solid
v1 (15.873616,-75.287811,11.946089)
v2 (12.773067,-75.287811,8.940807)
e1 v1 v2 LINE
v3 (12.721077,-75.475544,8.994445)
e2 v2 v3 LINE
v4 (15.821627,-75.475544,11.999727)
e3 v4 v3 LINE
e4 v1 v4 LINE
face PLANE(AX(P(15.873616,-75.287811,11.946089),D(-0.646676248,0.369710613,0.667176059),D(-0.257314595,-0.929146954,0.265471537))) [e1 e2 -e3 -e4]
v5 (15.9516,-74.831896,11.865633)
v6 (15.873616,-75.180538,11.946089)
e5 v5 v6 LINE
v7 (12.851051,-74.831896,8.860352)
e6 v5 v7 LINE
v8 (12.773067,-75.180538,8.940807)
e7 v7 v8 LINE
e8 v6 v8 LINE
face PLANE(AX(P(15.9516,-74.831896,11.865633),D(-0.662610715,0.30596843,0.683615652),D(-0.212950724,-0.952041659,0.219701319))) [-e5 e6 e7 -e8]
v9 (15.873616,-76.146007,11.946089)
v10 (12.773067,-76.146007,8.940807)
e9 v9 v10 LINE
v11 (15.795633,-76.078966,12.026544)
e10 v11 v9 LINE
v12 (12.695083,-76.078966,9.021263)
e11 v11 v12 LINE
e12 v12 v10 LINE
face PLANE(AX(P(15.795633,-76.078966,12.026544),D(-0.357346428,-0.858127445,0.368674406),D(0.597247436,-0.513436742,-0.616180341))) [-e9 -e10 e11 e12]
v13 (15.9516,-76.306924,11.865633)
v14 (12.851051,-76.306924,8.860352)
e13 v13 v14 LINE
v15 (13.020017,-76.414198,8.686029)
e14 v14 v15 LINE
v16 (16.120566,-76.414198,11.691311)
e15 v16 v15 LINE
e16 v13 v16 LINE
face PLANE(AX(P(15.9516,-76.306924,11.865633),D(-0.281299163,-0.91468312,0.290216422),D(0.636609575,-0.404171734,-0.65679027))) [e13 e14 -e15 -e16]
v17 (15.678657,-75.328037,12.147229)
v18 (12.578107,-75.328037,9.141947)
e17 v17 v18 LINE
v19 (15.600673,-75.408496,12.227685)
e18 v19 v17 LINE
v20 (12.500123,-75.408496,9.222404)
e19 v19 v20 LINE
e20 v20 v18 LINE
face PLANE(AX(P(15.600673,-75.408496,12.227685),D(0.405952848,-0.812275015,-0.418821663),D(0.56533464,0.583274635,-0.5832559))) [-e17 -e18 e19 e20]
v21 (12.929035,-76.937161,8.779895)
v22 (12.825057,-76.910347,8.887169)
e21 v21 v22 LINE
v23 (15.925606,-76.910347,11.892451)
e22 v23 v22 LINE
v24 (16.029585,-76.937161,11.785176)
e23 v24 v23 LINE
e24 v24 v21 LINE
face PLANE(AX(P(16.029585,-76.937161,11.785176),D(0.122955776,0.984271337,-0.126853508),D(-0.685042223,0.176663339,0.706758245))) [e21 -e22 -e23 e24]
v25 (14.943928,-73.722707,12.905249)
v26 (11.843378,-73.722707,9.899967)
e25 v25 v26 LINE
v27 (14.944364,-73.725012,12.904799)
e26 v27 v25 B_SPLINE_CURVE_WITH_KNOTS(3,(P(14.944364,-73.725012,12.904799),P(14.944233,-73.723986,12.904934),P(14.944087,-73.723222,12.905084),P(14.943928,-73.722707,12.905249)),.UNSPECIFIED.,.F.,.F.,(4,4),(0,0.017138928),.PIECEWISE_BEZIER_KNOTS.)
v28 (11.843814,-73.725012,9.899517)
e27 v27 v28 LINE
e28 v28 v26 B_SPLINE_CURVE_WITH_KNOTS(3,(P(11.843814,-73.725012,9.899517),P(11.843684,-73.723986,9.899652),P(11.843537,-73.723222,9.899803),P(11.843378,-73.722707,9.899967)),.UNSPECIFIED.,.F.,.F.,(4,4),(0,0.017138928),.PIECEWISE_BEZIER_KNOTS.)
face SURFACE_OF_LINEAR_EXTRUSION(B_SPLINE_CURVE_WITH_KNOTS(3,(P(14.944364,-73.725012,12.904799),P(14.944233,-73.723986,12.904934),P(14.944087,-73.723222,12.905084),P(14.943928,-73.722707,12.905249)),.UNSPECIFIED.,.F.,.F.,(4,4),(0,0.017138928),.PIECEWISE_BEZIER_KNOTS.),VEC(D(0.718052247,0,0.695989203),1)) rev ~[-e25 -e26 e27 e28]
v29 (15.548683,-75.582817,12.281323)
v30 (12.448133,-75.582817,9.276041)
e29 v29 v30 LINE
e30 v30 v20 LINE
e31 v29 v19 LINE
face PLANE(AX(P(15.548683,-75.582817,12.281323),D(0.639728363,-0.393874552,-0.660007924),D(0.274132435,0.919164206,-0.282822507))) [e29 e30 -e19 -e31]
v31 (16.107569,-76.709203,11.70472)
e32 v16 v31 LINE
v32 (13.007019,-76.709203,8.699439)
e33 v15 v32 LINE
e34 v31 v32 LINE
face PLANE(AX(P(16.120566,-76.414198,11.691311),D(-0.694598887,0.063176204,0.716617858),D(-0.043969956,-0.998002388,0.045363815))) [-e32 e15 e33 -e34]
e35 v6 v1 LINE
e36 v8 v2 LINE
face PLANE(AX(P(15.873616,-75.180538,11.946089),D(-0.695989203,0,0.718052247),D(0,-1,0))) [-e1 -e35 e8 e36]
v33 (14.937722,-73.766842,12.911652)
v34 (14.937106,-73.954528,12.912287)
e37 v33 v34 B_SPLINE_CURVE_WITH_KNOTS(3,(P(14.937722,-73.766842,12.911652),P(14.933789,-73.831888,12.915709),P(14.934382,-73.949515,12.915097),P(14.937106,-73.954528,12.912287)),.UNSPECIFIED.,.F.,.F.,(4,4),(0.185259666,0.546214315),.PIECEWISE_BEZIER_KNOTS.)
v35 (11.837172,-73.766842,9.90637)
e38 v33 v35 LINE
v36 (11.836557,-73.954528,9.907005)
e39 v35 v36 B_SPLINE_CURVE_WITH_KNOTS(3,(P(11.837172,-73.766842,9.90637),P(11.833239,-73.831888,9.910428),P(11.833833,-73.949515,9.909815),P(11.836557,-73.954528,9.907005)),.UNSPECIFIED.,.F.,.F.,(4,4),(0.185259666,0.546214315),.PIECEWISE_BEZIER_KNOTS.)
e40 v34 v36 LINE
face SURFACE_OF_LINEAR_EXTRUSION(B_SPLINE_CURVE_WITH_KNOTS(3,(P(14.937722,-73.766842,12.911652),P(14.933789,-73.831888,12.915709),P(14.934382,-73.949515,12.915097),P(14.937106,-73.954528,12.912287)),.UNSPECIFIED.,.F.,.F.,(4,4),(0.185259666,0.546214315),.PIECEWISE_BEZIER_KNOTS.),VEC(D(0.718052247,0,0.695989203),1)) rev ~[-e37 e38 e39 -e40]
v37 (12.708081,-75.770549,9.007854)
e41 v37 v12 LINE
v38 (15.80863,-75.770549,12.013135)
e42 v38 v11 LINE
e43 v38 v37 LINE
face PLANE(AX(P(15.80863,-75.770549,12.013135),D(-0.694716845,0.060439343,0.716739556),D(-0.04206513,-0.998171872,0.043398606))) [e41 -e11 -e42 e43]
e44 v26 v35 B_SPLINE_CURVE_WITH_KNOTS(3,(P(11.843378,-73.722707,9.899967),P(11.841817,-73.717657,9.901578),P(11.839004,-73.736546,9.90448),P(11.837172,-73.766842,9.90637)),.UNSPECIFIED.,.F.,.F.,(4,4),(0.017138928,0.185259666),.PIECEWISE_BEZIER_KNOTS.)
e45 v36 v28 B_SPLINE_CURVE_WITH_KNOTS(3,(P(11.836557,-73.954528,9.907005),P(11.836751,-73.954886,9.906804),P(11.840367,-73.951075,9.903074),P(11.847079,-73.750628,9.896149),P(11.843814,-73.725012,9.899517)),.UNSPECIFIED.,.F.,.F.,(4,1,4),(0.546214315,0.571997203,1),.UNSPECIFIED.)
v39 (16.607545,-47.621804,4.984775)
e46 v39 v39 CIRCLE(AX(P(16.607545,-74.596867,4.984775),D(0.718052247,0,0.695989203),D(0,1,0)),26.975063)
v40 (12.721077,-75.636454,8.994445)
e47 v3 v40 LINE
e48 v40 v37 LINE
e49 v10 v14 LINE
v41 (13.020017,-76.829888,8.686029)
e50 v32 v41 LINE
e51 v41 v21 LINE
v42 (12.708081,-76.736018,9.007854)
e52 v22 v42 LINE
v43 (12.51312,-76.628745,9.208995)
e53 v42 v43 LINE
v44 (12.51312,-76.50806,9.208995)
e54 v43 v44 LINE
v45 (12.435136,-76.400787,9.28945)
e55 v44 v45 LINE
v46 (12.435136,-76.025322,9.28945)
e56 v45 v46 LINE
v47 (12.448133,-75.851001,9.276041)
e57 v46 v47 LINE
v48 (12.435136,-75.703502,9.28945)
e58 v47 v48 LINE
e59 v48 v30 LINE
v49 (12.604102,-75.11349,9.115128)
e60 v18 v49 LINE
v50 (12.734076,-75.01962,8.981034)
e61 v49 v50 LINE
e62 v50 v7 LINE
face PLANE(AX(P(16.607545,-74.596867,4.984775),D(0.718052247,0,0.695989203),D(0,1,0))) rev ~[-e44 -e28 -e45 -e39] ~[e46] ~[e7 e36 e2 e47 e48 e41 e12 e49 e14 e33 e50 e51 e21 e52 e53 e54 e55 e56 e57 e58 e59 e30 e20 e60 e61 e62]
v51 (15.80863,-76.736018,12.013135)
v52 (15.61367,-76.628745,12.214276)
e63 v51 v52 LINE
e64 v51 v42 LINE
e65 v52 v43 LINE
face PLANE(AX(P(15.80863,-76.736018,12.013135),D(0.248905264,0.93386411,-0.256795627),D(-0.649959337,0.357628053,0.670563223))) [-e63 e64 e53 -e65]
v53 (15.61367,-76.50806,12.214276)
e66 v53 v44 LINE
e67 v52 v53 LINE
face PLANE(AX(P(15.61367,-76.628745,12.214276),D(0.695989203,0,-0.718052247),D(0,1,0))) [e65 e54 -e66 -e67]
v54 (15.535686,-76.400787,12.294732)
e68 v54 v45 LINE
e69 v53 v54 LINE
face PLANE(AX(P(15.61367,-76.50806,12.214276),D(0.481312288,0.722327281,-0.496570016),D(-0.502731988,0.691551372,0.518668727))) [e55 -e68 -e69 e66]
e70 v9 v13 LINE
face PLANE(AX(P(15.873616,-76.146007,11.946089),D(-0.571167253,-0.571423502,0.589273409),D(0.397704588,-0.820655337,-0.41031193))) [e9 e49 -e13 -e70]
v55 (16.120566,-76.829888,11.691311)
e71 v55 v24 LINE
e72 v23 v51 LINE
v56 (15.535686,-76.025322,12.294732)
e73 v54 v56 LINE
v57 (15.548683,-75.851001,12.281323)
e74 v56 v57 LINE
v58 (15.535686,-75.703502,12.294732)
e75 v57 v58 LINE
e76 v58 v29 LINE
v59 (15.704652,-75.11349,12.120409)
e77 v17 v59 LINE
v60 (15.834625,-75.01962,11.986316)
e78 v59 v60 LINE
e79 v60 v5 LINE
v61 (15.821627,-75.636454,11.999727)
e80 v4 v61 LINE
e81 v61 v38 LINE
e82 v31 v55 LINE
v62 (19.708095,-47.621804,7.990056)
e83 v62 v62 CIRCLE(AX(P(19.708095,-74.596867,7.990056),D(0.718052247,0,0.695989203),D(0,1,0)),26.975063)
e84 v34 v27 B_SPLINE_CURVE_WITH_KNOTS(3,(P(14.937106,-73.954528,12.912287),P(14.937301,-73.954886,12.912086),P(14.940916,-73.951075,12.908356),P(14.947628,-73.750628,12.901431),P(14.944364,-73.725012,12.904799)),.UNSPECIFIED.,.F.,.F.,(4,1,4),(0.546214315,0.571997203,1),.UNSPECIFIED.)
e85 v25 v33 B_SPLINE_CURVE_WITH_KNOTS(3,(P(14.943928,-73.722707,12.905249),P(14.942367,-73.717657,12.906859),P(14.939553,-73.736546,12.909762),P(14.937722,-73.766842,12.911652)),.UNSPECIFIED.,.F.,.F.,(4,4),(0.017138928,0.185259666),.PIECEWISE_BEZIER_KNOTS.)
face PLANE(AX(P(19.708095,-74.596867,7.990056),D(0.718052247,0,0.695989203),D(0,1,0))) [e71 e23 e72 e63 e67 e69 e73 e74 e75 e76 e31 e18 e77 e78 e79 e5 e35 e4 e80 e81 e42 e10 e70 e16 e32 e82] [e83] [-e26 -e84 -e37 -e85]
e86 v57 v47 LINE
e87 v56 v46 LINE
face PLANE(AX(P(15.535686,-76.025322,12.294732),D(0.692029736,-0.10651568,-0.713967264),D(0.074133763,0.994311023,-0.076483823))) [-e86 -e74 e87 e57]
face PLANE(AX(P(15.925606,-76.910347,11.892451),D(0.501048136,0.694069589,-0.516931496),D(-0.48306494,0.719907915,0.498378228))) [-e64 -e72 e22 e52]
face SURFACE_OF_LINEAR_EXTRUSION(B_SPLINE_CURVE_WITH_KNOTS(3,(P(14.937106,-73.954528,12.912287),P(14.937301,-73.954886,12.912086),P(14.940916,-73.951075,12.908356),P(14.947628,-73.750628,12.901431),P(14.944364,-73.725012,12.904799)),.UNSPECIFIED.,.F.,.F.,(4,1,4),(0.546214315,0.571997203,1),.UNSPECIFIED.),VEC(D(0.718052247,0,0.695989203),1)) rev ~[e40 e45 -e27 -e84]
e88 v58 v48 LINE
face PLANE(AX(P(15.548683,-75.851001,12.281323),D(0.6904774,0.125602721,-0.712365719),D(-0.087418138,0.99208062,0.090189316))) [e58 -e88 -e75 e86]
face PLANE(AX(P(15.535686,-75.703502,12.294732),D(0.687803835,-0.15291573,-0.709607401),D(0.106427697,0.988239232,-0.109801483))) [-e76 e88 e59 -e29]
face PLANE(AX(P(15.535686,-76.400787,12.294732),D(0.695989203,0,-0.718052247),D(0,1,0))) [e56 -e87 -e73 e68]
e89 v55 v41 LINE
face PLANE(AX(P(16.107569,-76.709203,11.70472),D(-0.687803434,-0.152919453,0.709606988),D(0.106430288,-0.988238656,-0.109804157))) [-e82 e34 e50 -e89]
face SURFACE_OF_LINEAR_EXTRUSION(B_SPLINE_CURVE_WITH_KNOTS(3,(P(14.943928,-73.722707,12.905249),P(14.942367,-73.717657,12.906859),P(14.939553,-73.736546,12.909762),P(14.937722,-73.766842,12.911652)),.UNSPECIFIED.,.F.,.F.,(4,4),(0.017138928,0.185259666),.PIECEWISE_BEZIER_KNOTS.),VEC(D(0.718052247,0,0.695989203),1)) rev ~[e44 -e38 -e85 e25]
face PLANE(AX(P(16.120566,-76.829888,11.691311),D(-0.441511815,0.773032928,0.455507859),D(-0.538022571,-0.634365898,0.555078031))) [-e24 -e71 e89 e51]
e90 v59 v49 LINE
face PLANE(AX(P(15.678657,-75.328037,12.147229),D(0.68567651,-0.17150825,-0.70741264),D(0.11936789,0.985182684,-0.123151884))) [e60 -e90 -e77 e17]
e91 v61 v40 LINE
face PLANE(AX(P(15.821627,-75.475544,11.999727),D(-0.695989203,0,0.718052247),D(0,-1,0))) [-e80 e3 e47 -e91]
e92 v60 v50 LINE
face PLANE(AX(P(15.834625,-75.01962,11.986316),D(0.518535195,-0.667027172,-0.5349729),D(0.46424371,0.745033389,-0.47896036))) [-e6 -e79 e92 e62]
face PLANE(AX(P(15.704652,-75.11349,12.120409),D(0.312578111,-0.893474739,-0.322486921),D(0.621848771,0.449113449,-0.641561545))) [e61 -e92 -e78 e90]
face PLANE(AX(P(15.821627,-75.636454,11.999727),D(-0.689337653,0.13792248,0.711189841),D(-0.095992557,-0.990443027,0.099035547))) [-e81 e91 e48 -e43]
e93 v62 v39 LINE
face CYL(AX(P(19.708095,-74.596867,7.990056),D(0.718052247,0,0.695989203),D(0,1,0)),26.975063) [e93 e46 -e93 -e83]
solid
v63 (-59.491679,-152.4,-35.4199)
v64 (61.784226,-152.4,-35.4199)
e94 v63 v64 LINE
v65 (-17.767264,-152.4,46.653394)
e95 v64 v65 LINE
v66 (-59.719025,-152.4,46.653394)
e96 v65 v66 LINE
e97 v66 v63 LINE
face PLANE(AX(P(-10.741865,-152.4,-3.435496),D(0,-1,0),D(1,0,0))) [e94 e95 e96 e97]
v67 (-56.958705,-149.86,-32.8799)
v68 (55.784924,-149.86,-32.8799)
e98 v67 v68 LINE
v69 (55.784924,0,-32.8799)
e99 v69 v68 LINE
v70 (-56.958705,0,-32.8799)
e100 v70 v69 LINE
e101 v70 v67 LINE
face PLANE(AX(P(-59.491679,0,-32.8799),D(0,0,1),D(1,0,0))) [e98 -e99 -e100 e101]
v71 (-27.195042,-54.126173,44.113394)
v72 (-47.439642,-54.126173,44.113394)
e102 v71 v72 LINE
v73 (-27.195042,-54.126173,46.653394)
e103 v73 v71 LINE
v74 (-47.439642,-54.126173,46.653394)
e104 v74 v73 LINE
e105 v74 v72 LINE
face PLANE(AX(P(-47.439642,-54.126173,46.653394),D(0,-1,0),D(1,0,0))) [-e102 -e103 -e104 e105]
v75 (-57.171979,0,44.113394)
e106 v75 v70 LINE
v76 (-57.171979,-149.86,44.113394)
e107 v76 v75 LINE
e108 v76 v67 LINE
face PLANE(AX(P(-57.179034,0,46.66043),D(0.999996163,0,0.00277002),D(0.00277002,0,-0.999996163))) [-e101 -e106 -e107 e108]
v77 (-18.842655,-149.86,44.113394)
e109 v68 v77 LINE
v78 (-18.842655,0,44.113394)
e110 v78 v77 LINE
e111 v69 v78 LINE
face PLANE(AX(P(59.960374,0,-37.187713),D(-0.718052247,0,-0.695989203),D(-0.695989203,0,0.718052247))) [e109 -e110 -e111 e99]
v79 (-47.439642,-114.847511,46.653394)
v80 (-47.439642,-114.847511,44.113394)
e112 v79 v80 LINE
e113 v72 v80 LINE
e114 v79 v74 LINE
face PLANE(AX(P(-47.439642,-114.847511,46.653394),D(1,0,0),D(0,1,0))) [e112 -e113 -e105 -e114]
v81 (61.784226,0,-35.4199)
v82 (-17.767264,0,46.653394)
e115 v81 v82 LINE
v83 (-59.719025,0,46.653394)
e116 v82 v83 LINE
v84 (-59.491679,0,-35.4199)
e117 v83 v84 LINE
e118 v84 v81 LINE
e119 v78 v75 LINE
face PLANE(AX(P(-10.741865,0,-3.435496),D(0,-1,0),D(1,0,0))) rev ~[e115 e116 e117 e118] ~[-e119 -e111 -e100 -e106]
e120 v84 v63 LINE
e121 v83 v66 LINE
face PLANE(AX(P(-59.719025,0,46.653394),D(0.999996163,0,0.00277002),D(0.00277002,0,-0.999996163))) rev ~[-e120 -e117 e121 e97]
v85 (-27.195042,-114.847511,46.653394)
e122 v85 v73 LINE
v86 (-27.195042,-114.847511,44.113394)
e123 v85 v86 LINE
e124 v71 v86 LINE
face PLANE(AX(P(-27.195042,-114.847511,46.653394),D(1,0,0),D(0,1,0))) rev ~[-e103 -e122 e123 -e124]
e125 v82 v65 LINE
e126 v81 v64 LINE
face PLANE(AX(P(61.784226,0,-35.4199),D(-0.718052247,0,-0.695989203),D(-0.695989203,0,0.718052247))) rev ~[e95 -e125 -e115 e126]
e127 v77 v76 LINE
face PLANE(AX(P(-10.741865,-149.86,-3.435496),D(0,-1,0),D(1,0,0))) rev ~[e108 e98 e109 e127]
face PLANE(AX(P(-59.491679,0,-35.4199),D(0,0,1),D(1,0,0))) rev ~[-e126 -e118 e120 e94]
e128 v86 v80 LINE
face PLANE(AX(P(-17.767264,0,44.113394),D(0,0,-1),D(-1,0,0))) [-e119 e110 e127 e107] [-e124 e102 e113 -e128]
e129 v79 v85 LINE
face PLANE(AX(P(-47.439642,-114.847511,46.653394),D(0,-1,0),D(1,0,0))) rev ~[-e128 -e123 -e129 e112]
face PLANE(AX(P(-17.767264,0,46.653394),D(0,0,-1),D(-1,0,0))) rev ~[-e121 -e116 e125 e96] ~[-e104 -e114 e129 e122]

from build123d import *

# Parameters (mm, degrees)
F1_DEPTH = 152.4
F2_T     = -2.54
F3_R     = 26.9750626094
F5_DEPTH = 4.318
F4_W     = 20.2446002513
F4_H     = 60.7213377953
F6_DEPTH = 25.4


# Not quite as in the source:
# - a feature names something its author has since deleted; it is built from what else it names


with BuildPart() as f1:
    # F0 (on Front) → F1 (new body)
    with BuildSketch(Plane.XZ):
        Polygon((-59.7190245772, 46.653393656), (-59.4916790724, -35.4198999703), (61.7842264473, -35.4198999703), (-17.7672635764, 46.653393656), align=None)
    extrude(amount=F1_DEPTH)

    # F2
    f2_openings = [f1.faces().sort_by_distance(p)[0] for p in [
        (-15.567576, 0, -1.030813),
    ]]
    offset(amount=F2_T, openings=f2_openings)

    # F4 (on face) → F6 (cut)
    with BuildSketch(Plane.XY.offset(46.653393656)):
        with Locations((-37.3173421249, -84.4868421555)):
            Rectangle(F4_W, F4_H)
    extrude(amount=-F6_DEPTH, mode=Mode.SUBTRACT)


with BuildPart() as f5:
    # F3 (on face) → F5 (new body)
    with BuildSketch(Plane(origin=(14.1545580436, 0, 13.7196417159), x_dir=(0, 1, 0), z_dir=(0.7180522473, 0, 0.6959892026))):
        with Locations((-74.5968669653, -7.9793436453)):
            Circle(F3_R)
        Polygon((-76.937161386, -2.6940456592), (-76.9103467464, -2.5446491782), (-76.7360180616, -2.3765773512), (-76.6287446022, -2.096457174), (-76.5080600977, -2.096457174), (-76.4007866383, -1.9844097551), (-76.2398764491, -1.9844097551), (-76.0253220797, -1.9844097551), (-75.8510008454, -2.0030839369), (-75.7035017014, -1.9844097551), (-75.5828171968, -2.0030839369), (-75.4084959626, -2.0777829923), (-75.3280371428, -2.1898308769), (-75.1134902239, -2.2271808702), (-75.0196203589, -2.4139273446), (-74.8318955302, -2.581997076), (-75.1805379987, -2.4699498899), (-75.2878114581, -2.4699498899), (-75.4755437374, -2.3952506017), (-75.6364539266, -2.3952506017), (-75.7705494761, -2.3765773512), (-76.07896626, -2.3579027038), (-76.1460065842, -2.4699498899), (-76.3069242239, -2.581997076), (-76.4141976833, -2.8247681912), (-76.7092034221, -2.8060935438), (-76.8298879266, -2.8247681912), align=None, mode=Mode.SUBTRACT)
        with BuildLine():
            add(Edge.make_bspline(
                [(-73.7227074314, -1.1341697216), (-73.7176566552, -1.1319269484), (-73.7365462125, -1.127884318), (-73.7668424845, -1.1252524959)],
                knots=[0.0171389283, 0.0171389283, 0.0171389283, 0.0171389283, 0.1852596656, 0.1852596656, 0.1852596656, 0.1852596656], degree=3))
            add(Edge.make_bspline(
                [(-73.7250118097, -1.1347961173), (-73.7239860284, -1.1346082917), (-73.7232223286, -1.1343983593), (-73.7227074314, -1.1341697216)],
                knots=[0, 0, 0, 0, 0.0171389283, 0.0171389283, 0.0171389283, 0.0171389283], degree=3))
            add(Edge.make_bspline(
                [(-73.9545275863, -1.1243682694), (-73.9548856484, -1.1246478129), (-73.9510749235, -1.1298427137), (-73.7506281888, -1.1394866026), (-73.7250118097, -1.1347961173)],
                knots=[0.5462143148, 0.5462143148, 0.5462143148, 0.5462143148, 0.5719972033, 1, 1, 1, 1], degree=3))
            add(Edge.make_bspline(
                [(-73.7668424845, -1.1252524959), (-73.8318884771, -1.1196019828), (-73.9495147977, -1.1204547232), (-73.9545275863, -1.1243682694)],
                knots=[0.1852596656, 0.1852596656, 0.1852596656, 0.1852596656, 0.5462143148, 0.5462143148, 0.5462143148, 0.5462143148], degree=3))
        make_face(mode=Mode.SUBTRACT)
    extrude(amount=-F5_DEPTH)


solid = Compound([f1.part, f5.part])
